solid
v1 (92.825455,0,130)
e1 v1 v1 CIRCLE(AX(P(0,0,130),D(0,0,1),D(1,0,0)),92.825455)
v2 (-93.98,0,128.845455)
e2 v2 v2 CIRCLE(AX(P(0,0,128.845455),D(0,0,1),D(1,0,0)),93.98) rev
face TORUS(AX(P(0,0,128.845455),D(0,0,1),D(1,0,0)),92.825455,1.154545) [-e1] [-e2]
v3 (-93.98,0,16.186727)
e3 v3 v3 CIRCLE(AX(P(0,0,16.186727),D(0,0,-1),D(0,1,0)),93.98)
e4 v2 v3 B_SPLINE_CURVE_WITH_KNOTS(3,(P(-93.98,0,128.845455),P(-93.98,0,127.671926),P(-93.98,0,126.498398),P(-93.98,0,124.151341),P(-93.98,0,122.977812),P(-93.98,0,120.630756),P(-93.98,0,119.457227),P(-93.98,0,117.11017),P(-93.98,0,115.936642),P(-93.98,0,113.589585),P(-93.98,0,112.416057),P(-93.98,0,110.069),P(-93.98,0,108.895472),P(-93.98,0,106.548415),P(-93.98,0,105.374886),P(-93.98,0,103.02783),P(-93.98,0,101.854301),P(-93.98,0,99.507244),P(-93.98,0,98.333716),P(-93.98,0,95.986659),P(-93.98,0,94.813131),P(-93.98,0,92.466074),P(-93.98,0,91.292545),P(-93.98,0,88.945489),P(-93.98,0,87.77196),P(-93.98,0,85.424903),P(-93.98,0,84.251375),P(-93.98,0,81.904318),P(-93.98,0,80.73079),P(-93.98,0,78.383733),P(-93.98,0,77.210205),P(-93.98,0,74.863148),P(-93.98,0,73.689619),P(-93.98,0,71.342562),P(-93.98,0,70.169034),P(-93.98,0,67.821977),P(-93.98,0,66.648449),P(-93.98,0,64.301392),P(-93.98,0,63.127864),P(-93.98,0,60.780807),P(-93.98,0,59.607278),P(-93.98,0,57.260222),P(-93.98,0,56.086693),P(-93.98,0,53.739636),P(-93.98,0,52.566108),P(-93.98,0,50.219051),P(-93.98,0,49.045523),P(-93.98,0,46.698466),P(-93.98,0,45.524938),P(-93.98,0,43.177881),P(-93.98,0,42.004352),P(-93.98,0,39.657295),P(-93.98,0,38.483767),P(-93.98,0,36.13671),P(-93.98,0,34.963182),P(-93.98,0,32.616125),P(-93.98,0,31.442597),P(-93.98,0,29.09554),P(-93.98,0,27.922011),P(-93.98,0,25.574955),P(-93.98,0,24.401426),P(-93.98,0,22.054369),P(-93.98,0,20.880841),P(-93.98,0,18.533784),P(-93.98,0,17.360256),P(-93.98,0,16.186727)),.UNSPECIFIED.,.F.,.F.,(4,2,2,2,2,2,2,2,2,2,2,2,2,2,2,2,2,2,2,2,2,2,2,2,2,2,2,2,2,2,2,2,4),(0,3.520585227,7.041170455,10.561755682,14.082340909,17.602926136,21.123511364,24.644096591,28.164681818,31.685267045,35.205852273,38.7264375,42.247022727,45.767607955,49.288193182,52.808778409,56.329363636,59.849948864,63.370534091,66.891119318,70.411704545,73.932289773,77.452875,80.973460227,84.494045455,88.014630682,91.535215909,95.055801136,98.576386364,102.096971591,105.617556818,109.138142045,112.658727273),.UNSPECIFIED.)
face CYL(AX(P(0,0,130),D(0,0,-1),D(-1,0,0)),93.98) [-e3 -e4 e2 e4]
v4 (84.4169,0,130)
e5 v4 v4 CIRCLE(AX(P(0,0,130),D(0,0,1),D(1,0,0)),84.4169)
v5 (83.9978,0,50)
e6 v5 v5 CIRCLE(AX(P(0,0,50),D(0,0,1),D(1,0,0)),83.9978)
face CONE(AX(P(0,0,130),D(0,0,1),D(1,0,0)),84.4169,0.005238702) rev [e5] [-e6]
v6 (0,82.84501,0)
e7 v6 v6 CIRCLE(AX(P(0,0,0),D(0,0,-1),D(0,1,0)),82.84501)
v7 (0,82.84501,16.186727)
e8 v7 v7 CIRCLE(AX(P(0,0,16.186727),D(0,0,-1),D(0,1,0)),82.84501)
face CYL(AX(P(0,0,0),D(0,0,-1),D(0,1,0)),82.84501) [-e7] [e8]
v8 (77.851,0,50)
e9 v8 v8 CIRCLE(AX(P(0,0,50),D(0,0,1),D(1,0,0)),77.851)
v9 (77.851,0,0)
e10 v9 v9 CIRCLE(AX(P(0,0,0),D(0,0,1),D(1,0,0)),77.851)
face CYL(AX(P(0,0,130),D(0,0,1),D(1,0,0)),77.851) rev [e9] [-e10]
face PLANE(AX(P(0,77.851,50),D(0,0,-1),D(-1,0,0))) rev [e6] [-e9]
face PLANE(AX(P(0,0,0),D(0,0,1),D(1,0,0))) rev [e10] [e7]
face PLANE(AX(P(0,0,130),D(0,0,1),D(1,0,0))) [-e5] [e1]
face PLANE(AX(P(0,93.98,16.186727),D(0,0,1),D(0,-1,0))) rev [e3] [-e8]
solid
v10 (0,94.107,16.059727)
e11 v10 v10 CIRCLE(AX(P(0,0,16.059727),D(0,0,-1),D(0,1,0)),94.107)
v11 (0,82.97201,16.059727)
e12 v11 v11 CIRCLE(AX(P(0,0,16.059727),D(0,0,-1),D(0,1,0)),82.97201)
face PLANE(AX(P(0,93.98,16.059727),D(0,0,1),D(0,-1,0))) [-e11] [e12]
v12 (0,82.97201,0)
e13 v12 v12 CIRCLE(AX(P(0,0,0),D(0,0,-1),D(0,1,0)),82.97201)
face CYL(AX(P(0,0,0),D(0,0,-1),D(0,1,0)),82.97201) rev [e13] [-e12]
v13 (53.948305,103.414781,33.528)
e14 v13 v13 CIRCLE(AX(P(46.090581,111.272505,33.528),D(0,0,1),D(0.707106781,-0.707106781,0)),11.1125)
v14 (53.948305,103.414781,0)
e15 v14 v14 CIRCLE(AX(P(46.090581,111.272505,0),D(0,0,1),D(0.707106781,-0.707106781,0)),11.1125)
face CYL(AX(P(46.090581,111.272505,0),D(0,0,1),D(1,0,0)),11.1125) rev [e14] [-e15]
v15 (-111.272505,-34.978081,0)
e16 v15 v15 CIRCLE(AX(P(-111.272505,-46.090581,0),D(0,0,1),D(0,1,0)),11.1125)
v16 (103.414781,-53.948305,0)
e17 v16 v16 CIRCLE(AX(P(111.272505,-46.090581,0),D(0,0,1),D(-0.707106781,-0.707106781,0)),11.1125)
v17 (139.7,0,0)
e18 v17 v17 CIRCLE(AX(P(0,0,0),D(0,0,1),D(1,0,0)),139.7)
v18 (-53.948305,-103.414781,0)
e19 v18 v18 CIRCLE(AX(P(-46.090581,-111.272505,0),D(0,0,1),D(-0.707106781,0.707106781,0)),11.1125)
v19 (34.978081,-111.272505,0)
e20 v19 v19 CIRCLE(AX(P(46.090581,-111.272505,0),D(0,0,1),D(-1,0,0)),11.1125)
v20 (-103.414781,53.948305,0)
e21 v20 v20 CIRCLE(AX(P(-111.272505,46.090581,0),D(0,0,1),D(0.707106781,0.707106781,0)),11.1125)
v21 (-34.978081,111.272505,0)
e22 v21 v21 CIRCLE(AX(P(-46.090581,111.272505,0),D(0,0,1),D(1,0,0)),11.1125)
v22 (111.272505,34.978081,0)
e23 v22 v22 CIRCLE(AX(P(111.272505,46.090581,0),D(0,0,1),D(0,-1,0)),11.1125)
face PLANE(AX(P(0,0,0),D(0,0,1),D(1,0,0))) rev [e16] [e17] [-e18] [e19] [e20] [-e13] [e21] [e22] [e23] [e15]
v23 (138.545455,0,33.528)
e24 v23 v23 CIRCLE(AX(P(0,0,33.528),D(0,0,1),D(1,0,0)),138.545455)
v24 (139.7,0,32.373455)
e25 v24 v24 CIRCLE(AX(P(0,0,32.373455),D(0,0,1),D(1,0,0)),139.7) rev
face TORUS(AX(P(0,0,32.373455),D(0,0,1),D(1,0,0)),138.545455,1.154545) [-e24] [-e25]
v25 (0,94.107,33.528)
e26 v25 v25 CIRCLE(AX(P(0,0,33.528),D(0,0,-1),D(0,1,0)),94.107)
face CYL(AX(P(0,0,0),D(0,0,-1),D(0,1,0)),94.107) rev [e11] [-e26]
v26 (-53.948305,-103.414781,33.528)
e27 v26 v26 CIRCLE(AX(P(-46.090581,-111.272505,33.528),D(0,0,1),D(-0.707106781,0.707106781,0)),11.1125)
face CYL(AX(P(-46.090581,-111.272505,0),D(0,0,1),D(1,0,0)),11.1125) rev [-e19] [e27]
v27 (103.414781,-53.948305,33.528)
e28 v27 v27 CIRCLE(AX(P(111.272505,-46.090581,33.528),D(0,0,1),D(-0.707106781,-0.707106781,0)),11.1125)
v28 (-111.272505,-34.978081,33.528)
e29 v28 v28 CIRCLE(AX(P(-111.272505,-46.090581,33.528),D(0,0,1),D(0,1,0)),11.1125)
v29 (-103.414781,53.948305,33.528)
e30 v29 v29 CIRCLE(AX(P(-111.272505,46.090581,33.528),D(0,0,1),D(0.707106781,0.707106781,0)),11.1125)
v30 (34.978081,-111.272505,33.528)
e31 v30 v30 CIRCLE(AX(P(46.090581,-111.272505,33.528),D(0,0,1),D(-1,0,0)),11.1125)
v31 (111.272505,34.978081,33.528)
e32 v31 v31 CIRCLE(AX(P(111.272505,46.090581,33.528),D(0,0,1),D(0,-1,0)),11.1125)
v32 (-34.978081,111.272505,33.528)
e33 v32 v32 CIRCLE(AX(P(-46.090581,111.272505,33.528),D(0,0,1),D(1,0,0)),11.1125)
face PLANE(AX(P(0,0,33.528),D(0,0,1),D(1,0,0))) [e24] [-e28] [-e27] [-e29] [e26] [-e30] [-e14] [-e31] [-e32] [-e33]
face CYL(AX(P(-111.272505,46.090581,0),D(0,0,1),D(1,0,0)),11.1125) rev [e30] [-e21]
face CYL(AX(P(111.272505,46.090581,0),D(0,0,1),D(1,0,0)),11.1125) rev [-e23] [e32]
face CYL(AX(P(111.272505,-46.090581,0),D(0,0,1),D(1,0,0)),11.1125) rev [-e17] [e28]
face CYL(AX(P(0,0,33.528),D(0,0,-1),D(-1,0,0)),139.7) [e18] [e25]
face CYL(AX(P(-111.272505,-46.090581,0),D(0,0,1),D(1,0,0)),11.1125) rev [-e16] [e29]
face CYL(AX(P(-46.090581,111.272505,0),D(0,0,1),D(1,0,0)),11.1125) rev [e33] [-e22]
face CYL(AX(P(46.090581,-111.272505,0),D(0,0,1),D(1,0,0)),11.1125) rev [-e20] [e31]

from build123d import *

# Parameters (mm, degrees)
SKETCH1_R                       = 139.7
EXTRUDE1_DEPTH                  = 33.528
SKETCH2_R                       = 93.98
EXTRUDE2_DEPTH                  = 96.472
SKETCH3_R                       = 11.1125
EXTRUDE3_DEPTH                  = 220.861380838
CIRPATTERN1_COUNT               = 8
FILLET1_R                       = 1.154545455
CUT_REVOLVE_THIN1_START         = 16.059727273
CUT_REVOLVE_THIN1_OUTLINE_R     = 94.107
CUT_REVOLVE_THIN1_OUTLINE_R_2   = 93.98
CUT_REVOLVE_THIN1_DEPTH         = 17.468272727
CUT_REVOLVE_THIN1_2_OUTLINE_R   = 82.972009834
CUT_REVOLVE_THIN1_2_OUTLINE_R_2 = 82.845009834
CUT_REVOLVE_THIN1_2_DEPTH       = 16.186727273
CUT_REVOLVE_THIN1_3_OUTLINE_R   = 93.98
CUT_REVOLVE_THIN1_3_OUTLINE_R_2 = 82.972009834
CUT_REVOLVE_THIN1_3_DEPTH       = 0.127


# Read off the part's stored shape, not the designer's step: Cut-Revolve-Thin1
with BuildPart() as part:
    # Sketch1 → Extrude1 (new body)
    with BuildSketch(Plane.XY):
        Circle(SKETCH1_R)
    extrude(amount=EXTRUDE1_DEPTH)

    # Sketch2 → Extrude2 (add)
    with BuildSketch(Plane.XY.offset(33.528)):
        with Locations(Location((0, 0, 0), (0, 0, 180))):
            Circle(SKETCH2_R)
    extrude(amount=EXTRUDE2_DEPTH)

    # Sketch3 → Extrude3 (cut, through all)
    with BuildSketch(Plane.XY.offset(33.528)):
        with Locations((-46.090580656, 111.272504917)):
            Circle(SKETCH3_R)
    extrude3 = extrude(amount=-EXTRUDE3_DEPTH, mode=Mode.SUBTRACT)

    # CirPattern1: Extrude3 ×8 about axis
    cirpattern1_axis = Axis((0, 0, 0), (0, 0, 1))
    for i in range(1, CIRPATTERN1_COUNT):
        add(extrude3.rotate(cirpattern1_axis, i * 360 / CIRPATTERN1_COUNT), mode=Mode.SUBTRACT)

    # Fillet1
    fillet1_edges = [part.edges().sort_by_distance(p)[0] for p in [
        (-139.7, 0, 33.528),
        (93.98, 0, 130),
    ]]
    fillet(fillet1_edges, radius=FILLET1_R)

    # Sketch4 → Cut-Revolve1 (revolve, cut)
    with BuildSketch(Plane(origin=(0, 0, 62.70625), x_dir=(0, 0, 1), z_dir=(-1, 0, 0)), mode=Mode.PRIVATE) as cut_revolve1_sk:
        Polygon((-62.70625, 77.851), (-12.70625, 77.851), (-12.70625, 83.9978), (67.29375, 84.4169), (67.29375, 0), (-62.70625, 0), align=None)
    revolve(cut_revolve1_sk.sketch.rotate(Axis((0, 0, 130), (0, 0, -1)), 90), axis=Axis((0, 0, 130), (0, 0, -1)), mode=Mode.SUBTRACT)

    # Cut-Revolve-Thin1 outline → Cut-Revolve-Thin1 (cut)
    with BuildSketch(Plane.XY.offset(CUT_REVOLVE_THIN1_START)):
        Circle(CUT_REVOLVE_THIN1_OUTLINE_R)
        Circle(CUT_REVOLVE_THIN1_OUTLINE_R_2, mode=Mode.SUBTRACT)
    extrude(amount=CUT_REVOLVE_THIN1_DEPTH, mode=Mode.SUBTRACT)

    # Cut-Revolve-Thin1 2 outline → Cut-Revolve-Thin1 2 (cut)
    with BuildSketch(Plane.XY):
        Circle(CUT_REVOLVE_THIN1_2_OUTLINE_R)
        Circle(CUT_REVOLVE_THIN1_2_OUTLINE_R_2, mode=Mode.SUBTRACT)
    extrude(amount=CUT_REVOLVE_THIN1_2_DEPTH, mode=Mode.SUBTRACT)

    # Cut-Revolve-Thin1 3 outline → Cut-Revolve-Thin1 3 (cut)
    with BuildSketch(Plane.XY.offset(CUT_REVOLVE_THIN1_START)):
        Circle(CUT_REVOLVE_THIN1_3_OUTLINE_R)
        Circle(CUT_REVOLVE_THIN1_3_OUTLINE_R_2, mode=Mode.SUBTRACT)
    extrude(amount=CUT_REVOLVE_THIN1_3_DEPTH, mode=Mode.SUBTRACT)


solid = part.part
